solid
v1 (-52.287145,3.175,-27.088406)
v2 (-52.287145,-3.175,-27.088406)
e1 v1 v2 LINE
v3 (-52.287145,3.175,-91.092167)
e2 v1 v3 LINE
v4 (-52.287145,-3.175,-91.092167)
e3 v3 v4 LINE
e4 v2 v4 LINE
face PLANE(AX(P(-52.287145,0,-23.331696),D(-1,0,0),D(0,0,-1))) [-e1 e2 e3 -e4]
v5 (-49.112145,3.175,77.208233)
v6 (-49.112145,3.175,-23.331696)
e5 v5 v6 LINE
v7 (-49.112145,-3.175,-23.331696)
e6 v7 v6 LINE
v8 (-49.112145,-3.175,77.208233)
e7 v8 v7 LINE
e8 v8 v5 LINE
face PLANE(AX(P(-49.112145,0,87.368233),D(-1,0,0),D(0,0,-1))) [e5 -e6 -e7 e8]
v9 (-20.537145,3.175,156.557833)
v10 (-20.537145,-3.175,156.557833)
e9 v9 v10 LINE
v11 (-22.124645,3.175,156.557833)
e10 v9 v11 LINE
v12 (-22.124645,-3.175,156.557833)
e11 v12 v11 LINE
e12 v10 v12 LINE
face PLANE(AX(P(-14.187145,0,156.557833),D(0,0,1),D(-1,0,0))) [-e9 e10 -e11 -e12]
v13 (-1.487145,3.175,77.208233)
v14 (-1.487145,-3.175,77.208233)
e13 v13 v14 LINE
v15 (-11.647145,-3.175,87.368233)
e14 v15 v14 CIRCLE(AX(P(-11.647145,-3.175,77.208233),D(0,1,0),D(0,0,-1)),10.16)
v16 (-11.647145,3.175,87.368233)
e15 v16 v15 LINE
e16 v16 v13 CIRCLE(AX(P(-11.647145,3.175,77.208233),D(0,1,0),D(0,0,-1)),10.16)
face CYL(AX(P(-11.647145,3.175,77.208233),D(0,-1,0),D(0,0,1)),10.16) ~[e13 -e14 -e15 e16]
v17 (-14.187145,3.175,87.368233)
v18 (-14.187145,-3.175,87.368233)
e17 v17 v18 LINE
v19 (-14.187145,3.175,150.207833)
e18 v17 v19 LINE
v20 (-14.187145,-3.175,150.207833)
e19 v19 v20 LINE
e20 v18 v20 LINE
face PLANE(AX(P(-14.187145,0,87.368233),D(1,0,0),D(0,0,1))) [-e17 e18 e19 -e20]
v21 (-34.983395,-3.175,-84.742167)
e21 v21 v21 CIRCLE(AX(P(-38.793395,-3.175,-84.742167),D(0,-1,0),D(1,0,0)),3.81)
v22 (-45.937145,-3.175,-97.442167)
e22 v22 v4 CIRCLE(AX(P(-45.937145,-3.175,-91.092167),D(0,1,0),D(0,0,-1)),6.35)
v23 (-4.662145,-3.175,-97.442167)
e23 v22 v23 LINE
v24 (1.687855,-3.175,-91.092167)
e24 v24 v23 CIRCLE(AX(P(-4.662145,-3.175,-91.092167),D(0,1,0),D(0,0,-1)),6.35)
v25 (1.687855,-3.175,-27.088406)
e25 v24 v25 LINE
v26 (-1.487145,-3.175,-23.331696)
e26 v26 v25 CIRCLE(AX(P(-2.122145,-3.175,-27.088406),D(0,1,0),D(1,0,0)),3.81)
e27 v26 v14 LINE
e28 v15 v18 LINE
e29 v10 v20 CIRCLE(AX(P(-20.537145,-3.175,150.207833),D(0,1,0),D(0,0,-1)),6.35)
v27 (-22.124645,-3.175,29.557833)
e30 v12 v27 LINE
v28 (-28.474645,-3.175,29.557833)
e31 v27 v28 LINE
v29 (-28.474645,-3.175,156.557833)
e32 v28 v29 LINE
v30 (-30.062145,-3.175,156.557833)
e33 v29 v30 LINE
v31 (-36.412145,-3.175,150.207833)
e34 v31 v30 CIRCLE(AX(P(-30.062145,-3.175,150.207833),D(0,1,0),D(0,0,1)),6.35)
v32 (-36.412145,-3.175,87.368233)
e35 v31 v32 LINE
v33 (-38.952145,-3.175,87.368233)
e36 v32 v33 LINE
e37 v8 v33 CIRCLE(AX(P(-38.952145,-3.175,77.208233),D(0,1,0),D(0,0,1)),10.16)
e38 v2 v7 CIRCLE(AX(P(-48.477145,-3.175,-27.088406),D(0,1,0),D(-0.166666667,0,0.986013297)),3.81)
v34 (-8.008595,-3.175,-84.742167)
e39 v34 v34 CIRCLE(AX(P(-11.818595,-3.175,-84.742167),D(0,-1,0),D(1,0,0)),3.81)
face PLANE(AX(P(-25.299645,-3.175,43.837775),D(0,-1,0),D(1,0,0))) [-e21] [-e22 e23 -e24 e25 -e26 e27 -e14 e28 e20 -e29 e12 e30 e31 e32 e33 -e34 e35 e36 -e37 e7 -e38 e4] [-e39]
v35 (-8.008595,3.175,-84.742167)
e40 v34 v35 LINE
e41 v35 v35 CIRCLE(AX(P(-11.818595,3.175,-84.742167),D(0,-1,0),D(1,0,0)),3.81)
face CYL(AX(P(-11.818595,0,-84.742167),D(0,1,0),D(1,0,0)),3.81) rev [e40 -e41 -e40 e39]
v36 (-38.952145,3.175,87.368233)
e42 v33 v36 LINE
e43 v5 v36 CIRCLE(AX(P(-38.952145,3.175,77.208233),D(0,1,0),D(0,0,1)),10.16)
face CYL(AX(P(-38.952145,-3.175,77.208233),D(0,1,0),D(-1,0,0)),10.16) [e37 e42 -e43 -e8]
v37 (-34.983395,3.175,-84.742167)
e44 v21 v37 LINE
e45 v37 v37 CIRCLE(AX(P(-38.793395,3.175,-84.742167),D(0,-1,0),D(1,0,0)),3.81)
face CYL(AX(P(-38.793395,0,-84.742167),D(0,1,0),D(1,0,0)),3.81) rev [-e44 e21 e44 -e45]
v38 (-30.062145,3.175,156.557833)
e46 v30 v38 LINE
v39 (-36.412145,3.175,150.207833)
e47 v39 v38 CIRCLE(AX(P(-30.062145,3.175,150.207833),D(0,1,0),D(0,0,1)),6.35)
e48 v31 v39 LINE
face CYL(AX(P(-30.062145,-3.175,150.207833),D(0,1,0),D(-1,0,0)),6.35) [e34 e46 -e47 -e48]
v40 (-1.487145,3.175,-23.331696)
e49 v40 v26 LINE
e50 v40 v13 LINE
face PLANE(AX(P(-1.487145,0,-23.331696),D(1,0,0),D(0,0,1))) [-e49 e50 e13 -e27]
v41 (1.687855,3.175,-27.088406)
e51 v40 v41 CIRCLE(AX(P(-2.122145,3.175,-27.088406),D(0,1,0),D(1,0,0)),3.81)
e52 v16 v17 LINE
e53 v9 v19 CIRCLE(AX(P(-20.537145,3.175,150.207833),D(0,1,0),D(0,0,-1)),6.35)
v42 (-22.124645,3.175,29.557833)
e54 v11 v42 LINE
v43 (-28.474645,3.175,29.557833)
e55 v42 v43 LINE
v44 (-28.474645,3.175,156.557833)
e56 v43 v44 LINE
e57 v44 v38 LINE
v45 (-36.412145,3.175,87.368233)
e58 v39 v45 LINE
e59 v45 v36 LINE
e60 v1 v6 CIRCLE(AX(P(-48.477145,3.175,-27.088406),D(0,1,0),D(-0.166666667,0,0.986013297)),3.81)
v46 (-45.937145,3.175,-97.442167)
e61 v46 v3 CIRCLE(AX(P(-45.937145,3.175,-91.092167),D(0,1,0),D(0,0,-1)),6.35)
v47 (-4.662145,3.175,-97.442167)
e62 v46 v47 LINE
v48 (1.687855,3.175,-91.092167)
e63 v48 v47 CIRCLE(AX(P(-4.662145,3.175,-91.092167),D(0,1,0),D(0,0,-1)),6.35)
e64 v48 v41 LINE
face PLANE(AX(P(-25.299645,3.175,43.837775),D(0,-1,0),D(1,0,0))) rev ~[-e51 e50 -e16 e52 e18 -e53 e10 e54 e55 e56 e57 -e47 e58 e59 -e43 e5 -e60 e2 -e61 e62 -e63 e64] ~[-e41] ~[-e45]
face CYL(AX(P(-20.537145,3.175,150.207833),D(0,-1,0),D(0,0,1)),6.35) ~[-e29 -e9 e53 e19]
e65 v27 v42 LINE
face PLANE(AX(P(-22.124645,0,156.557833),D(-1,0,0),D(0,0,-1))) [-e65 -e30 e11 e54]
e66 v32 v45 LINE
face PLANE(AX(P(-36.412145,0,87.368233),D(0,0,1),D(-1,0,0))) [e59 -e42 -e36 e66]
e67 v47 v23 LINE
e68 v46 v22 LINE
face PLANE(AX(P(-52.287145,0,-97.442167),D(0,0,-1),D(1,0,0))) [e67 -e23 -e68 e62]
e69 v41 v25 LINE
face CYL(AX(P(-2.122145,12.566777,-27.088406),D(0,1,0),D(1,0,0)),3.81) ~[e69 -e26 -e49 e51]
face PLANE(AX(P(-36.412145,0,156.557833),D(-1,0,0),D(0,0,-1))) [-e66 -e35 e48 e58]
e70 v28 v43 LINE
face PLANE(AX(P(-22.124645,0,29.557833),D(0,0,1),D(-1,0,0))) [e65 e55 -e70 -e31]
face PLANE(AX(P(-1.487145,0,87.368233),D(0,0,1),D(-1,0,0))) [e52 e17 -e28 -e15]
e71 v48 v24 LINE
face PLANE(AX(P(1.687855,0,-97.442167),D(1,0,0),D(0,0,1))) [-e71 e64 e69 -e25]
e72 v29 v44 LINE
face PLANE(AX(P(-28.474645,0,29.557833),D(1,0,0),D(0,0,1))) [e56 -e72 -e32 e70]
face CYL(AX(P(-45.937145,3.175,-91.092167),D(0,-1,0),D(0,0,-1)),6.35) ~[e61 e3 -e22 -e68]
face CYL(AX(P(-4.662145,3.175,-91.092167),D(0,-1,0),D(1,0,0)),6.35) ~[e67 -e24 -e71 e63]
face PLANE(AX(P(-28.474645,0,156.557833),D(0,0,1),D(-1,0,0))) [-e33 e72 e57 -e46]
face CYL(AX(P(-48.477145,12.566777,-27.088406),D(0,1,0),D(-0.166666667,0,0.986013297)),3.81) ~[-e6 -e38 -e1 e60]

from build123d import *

# Parameters (mm, degrees)
F0_R        = 3.81
F1_DEPTH    = 3.175
F2_R        = 10.16
F3_R        = 6.35
F4_T1_DEPTH = 25.1335533113
F5_R        = 6.35


# Not quite as in the source:
# - a fillet or chamfer that OpenCascade refuses, or shapes differently, is made with other operations: its cross-section is extruded or revolved along the edge and cut away or added


with BuildPart() as f1:
    # F0 (on Front) → F1 (new body, symmetric)
    with BuildSketch(Plane.XZ):
        Polygon((-49.1121449284, -23.3316957779), (-52.2871449284, -23.3316957779), (-52.2871449284, -97.4421674833), (1.6878550716, -97.4421674833), (1.6878550716, -23.3316957779), (-1.4871449284, -23.3316957779), (-1.4871449284, 87.3682325167), (-14.1871449284, 87.3682325167), (-14.1871449284, 156.5578325167), (-22.1246449284, 156.5578325167), (-22.1246449284, 29.5578325167), (-28.4746449284, 29.5578325167), (-28.4746449284, 156.5578325167), (-36.4121449284, 156.5578325167), (-36.4121449284, 87.3682325167), (-49.1121449284, 87.3682325167), align=None)
        with Locations((-38.7933949284, -84.7421674833)):
            Circle(F0_R, mode=Mode.SUBTRACT)
        with Locations((-11.8185949284, -84.7421674833)):
            Circle(F0_R, mode=Mode.SUBTRACT)
    extrude(amount=F1_DEPTH, both=True)

    # F2
    f2_edges = [f1.edges().sort_by_distance(p)[0] for p in [
        (-1.487145, 0, 87.368233),
        (-49.112145, 0, 87.368233),
    ]]
    fillet(f2_edges, radius=F2_R)

    # F3
    f3_edges = [f1.edges().sort_by_distance(p)[0] for p in [
        (-14.187145, 0, 156.557833),
        (-36.412145, 0, 156.557833),
    ]]
    fillet(f3_edges, radius=F3_R)

    # F4: fillet of radius 3.81 on 2 edges, made by hand

    # F4_s2 → F4_t1 (cut)
    with BuildSketch(Plane.XZ.offset(-12.5667766557)):
        with BuildLine():
            ThreePointArc((-49.1121449284, -23.3316957779), (-51.3870804947, -24.6290620154), (-52.2871449284, -27.0884064402))
            Line((-52.2871449284, -27.0884064402), (-52.2871449284, -23.3316957779))
            Line((-52.2871449284, -23.3316957779), (-49.1121449284, -23.3316957779))
        make_face()
        with BuildLine():
            ThreePointArc((1.6878550716, -27.0884064402), (0.7877906379, -24.6290620154), (-1.4871449284, -23.3316957779))
            Line((-1.4871449284, -23.3316957779), (1.6878550716, -23.3316957779))
            Line((1.6878550716, -23.3316957779), (1.6878550716, -27.0884064402))
        make_face()
    extrude(amount=F4_T1_DEPTH, mode=Mode.SUBTRACT)

    # F5
    f5_edges = [f1.edges().sort_by_distance(p)[0] for p in [
        (-52.287145, 0, -97.442167),
        (1.687855, 0, -97.442167),
    ]]
    fillet(f5_edges, radius=F5_R)


solid = f1.part
